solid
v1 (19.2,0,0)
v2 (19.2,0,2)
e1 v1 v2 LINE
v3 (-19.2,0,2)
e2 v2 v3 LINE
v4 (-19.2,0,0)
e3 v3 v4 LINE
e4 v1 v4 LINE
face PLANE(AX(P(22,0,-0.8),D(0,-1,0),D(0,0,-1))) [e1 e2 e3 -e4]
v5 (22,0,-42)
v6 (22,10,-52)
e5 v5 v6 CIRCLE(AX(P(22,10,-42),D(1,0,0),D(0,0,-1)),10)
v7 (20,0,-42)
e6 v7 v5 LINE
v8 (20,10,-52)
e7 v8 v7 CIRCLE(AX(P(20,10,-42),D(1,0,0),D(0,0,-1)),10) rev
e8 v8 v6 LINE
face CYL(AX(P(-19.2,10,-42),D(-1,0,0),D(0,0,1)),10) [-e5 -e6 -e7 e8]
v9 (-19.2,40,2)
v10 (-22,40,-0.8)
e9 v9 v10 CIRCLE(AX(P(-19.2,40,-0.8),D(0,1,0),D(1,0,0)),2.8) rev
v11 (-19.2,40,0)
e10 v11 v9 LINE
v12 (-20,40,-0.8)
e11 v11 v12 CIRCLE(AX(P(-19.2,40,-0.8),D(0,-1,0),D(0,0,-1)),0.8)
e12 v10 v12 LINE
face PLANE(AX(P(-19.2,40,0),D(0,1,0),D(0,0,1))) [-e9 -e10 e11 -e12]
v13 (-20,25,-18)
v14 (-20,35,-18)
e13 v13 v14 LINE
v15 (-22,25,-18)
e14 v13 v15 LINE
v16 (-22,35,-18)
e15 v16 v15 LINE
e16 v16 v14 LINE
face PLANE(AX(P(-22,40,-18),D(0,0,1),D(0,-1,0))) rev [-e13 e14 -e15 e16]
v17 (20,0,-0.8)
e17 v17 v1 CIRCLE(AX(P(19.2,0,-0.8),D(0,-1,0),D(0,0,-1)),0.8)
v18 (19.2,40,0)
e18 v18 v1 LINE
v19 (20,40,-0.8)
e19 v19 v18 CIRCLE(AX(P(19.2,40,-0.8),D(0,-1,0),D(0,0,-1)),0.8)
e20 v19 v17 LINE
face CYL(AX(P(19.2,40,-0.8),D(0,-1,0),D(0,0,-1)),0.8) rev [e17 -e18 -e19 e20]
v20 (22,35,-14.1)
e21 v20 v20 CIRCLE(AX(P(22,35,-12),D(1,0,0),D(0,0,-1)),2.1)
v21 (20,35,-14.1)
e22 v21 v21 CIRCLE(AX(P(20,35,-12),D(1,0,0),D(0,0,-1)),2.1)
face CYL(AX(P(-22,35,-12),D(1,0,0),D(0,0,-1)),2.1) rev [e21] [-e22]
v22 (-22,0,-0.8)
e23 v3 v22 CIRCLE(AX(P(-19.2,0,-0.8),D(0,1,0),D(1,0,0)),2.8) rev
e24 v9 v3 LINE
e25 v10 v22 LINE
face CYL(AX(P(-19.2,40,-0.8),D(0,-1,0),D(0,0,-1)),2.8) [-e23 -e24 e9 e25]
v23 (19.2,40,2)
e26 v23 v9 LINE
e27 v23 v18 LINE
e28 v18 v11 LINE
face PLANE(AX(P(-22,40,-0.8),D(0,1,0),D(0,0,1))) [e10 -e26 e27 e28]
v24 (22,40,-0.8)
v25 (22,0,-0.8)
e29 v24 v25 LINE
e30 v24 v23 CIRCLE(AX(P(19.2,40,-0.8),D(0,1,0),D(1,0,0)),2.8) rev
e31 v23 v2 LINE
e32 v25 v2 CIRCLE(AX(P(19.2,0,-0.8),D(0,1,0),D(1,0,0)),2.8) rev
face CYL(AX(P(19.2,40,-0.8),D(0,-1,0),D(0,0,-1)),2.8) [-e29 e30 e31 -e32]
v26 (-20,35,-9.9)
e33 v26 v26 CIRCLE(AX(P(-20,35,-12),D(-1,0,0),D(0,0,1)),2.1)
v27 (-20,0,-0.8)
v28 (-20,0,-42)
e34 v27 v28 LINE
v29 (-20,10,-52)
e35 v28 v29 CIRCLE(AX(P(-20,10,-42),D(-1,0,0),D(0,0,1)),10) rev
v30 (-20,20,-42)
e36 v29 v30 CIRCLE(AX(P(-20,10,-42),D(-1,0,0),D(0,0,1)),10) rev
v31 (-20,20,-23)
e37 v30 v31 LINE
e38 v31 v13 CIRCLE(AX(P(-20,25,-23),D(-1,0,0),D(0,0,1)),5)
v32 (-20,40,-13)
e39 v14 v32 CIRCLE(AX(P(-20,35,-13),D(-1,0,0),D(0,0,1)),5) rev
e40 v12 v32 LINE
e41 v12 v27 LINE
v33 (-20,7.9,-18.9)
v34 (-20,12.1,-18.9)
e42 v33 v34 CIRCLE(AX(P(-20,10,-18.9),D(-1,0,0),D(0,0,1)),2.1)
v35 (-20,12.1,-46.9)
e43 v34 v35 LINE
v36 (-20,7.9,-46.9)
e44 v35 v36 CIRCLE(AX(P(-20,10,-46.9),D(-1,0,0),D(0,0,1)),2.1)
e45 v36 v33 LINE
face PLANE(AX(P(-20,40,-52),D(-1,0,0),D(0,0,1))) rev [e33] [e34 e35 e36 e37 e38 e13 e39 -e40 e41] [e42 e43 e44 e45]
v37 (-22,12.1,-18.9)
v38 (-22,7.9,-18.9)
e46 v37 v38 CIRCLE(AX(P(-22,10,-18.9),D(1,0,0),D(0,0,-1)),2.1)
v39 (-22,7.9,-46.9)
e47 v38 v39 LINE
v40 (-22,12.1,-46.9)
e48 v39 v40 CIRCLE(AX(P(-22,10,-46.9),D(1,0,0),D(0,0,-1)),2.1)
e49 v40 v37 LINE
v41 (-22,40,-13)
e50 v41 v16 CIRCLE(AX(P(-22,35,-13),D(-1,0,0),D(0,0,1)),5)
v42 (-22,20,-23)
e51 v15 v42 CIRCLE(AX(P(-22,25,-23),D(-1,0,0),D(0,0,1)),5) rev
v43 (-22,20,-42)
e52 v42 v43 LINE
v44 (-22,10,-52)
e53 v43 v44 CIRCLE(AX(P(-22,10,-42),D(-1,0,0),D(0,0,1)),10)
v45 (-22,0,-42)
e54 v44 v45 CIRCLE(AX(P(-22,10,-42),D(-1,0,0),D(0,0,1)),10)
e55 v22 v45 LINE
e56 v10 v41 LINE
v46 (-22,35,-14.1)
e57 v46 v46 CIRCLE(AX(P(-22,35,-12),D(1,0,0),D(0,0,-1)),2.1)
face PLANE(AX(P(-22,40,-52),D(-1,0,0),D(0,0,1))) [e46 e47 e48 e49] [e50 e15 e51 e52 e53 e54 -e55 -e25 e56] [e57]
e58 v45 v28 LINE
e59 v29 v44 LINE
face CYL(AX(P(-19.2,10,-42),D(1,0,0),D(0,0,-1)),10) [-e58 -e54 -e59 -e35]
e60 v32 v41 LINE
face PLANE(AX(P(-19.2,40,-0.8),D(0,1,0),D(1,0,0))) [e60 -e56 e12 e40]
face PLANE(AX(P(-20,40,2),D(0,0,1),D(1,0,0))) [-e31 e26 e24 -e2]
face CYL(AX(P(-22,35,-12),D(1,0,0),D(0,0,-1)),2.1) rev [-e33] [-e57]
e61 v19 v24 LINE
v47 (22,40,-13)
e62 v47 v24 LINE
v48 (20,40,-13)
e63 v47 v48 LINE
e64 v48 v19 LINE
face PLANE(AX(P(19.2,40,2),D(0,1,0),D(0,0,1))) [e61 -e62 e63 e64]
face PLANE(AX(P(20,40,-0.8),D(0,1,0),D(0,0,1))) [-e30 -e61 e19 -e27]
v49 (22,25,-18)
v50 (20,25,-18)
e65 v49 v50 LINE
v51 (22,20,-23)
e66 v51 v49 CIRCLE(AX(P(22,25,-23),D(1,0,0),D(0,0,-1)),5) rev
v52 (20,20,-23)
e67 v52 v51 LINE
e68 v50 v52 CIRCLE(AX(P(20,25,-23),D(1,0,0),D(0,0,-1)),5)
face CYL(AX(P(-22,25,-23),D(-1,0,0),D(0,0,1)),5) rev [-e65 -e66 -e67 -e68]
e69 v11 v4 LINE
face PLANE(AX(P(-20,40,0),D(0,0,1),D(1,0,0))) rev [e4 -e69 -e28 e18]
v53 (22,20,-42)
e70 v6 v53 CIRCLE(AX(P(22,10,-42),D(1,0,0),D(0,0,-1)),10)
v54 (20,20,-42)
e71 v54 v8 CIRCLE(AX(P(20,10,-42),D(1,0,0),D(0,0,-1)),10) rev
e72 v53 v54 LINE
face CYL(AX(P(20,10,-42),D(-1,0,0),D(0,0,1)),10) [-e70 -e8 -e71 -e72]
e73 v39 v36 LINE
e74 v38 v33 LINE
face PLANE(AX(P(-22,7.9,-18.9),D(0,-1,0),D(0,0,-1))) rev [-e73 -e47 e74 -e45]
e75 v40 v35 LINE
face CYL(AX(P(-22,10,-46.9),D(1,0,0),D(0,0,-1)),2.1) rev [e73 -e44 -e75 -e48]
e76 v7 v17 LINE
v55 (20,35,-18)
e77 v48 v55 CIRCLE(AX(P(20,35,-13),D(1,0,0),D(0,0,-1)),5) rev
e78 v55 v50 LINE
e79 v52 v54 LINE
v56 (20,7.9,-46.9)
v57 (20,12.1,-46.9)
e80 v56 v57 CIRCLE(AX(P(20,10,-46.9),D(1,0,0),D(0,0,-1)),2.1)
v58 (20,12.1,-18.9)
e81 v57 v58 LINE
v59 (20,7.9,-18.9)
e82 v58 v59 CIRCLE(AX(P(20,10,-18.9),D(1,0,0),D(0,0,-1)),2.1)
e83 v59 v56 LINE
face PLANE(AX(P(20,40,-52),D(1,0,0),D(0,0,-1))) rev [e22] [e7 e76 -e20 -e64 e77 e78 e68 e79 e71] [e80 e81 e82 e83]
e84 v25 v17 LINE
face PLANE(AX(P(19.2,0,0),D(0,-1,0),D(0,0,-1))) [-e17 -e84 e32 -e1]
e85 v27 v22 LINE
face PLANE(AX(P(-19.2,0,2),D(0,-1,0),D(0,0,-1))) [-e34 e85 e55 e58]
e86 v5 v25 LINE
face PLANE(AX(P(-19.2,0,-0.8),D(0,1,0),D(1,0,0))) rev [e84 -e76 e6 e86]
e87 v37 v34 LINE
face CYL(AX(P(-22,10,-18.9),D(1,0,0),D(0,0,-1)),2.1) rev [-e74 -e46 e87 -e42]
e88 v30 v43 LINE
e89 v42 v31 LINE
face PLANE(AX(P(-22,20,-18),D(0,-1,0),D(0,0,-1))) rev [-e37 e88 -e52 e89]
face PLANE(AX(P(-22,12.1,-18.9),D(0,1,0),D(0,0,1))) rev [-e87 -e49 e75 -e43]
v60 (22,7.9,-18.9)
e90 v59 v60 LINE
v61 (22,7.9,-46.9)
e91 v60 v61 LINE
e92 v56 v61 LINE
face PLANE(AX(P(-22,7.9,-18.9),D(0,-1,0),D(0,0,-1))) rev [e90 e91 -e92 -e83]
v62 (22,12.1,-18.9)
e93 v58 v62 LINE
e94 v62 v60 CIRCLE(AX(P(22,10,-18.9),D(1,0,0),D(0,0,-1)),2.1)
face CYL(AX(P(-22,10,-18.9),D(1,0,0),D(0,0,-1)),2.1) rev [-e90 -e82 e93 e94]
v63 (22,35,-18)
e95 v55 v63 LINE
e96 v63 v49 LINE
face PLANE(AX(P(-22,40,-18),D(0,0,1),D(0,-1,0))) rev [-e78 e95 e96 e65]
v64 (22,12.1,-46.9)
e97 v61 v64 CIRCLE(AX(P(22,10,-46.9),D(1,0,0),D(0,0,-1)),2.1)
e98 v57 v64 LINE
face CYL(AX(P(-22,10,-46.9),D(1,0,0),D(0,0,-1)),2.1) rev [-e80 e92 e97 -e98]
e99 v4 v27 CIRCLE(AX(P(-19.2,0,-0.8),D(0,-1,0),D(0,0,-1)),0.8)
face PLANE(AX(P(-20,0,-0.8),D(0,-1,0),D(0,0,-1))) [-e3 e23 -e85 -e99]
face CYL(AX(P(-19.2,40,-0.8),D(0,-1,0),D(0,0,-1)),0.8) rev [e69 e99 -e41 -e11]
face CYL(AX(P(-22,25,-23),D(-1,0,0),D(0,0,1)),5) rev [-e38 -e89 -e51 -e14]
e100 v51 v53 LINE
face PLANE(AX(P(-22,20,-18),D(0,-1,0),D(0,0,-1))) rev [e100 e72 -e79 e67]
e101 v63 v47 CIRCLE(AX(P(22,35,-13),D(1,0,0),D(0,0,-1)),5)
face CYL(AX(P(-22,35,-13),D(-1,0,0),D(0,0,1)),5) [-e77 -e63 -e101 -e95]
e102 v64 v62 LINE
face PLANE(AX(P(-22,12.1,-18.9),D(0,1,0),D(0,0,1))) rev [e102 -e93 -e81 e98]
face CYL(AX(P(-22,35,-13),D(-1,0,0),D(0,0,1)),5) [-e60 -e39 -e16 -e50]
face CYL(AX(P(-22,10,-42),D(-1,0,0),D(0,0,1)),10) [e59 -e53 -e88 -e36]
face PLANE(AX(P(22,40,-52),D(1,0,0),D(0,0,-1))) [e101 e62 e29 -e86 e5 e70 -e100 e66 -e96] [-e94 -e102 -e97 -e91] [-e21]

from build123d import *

# Parameters (mm, degrees)
BASE_FLANGE1_DEPTH = 40
SKETCH6_W          = 34
SKETCH6_H          = 20
CUT_EXTRUDE1_DEPTH = 79.993670633
FILLET1_R          = 10
FILLET2_R          = 5
SKETCH7_R          = 2.1
CUT_EXTRUDE2_DEPTH = 79.993670633


# Read off the part's stored shape, not the designer's step: Base-Flange1
with BuildPart() as part:
    # Base-Flange1 outline → Base-Flange1 (new body)
    with BuildSketch(Plane(origin=(0, 0, 0), x_dir=(1, 0, 0), z_dir=(0, 1, 0))):
        with BuildLine():
            Line((-20, 0.8), (-20, 52))
            Line((-20, 52), (-22, 52))
            Line((-22, 52), (-22, 0.8))
            ThreePointArc((-22, 0.8), (-21.179898987, -1.179898987), (-19.2, -2))
            Line((-19.2, -2), (19.2, -2))
            ThreePointArc((19.2, -2), (21.179898987, -1.179898987), (22, 0.8))
            Line((22, 0.8), (22, 52))
            Line((22, 52), (20, 52))
            Line((20, 52), (20, 0.8))
            ThreePointArc((20, 0.8), (19.765685425, 0.234314575), (19.2, 0))
            Line((19.2, 0), (-19.2, 0))
            ThreePointArc((-19.2, 0), (-19.765685425, 0.234314575), (-20, 0.8))
        make_face()
    extrude(amount=BASE_FLANGE1_DEPTH)

    # Sketch6 → Cut-Extrude1 (cut, through all)
    with BuildSketch(Plane(origin=(22, 0, 0), x_dir=(0, 0, -1), z_dir=(1, 0, 0))):
        with Locations((35, 30)):
            Rectangle(SKETCH6_W, SKETCH6_H)
    extrude(amount=-CUT_EXTRUDE1_DEPTH, mode=Mode.SUBTRACT)

    # Fillet1
    fillet1_edges = [part.edges().sort_by_distance(p)[0] for p in [
        (-21, 0, -52),
        (-21, 20, -52),
        (21, 0, -52),
        (21, 20, -52),
    ]]
    fillet(fillet1_edges, radius=FILLET1_R - 0.0001)  # a hair under: the kernel refuses the full size

    # Fillet2
    fillet2_edges = [part.edges().sort_by_distance(p)[0] for p in [
        (-21, 40, -18),
        (21, 40, -18),
        (-21, 20, -18),
        (21, 20, -18),
    ]]
    fillet(fillet2_edges, radius=FILLET2_R)

    # Sketch7 → Cut-Extrude2 (cut, through all)
    with BuildSketch(Plane(origin=(22, 0, 0), x_dir=(0, 0, -1), z_dir=(1, 0, 0))):
        with Locations((12, 35)):
            Circle(SKETCH7_R)
        with BuildLine():
            Line((18.9, 12.1), (46.9, 12.1))
            ThreePointArc((46.9, 12.1), (49, 10), (46.9, 7.9))
            Line((46.9, 7.9), (18.9, 7.9))
            ThreePointArc((18.9, 7.9), (16.8, 10), (18.9, 12.1))
        make_face()
    extrude(amount=-CUT_EXTRUDE2_DEPTH, mode=Mode.SUBTRACT)


solid = part.part
